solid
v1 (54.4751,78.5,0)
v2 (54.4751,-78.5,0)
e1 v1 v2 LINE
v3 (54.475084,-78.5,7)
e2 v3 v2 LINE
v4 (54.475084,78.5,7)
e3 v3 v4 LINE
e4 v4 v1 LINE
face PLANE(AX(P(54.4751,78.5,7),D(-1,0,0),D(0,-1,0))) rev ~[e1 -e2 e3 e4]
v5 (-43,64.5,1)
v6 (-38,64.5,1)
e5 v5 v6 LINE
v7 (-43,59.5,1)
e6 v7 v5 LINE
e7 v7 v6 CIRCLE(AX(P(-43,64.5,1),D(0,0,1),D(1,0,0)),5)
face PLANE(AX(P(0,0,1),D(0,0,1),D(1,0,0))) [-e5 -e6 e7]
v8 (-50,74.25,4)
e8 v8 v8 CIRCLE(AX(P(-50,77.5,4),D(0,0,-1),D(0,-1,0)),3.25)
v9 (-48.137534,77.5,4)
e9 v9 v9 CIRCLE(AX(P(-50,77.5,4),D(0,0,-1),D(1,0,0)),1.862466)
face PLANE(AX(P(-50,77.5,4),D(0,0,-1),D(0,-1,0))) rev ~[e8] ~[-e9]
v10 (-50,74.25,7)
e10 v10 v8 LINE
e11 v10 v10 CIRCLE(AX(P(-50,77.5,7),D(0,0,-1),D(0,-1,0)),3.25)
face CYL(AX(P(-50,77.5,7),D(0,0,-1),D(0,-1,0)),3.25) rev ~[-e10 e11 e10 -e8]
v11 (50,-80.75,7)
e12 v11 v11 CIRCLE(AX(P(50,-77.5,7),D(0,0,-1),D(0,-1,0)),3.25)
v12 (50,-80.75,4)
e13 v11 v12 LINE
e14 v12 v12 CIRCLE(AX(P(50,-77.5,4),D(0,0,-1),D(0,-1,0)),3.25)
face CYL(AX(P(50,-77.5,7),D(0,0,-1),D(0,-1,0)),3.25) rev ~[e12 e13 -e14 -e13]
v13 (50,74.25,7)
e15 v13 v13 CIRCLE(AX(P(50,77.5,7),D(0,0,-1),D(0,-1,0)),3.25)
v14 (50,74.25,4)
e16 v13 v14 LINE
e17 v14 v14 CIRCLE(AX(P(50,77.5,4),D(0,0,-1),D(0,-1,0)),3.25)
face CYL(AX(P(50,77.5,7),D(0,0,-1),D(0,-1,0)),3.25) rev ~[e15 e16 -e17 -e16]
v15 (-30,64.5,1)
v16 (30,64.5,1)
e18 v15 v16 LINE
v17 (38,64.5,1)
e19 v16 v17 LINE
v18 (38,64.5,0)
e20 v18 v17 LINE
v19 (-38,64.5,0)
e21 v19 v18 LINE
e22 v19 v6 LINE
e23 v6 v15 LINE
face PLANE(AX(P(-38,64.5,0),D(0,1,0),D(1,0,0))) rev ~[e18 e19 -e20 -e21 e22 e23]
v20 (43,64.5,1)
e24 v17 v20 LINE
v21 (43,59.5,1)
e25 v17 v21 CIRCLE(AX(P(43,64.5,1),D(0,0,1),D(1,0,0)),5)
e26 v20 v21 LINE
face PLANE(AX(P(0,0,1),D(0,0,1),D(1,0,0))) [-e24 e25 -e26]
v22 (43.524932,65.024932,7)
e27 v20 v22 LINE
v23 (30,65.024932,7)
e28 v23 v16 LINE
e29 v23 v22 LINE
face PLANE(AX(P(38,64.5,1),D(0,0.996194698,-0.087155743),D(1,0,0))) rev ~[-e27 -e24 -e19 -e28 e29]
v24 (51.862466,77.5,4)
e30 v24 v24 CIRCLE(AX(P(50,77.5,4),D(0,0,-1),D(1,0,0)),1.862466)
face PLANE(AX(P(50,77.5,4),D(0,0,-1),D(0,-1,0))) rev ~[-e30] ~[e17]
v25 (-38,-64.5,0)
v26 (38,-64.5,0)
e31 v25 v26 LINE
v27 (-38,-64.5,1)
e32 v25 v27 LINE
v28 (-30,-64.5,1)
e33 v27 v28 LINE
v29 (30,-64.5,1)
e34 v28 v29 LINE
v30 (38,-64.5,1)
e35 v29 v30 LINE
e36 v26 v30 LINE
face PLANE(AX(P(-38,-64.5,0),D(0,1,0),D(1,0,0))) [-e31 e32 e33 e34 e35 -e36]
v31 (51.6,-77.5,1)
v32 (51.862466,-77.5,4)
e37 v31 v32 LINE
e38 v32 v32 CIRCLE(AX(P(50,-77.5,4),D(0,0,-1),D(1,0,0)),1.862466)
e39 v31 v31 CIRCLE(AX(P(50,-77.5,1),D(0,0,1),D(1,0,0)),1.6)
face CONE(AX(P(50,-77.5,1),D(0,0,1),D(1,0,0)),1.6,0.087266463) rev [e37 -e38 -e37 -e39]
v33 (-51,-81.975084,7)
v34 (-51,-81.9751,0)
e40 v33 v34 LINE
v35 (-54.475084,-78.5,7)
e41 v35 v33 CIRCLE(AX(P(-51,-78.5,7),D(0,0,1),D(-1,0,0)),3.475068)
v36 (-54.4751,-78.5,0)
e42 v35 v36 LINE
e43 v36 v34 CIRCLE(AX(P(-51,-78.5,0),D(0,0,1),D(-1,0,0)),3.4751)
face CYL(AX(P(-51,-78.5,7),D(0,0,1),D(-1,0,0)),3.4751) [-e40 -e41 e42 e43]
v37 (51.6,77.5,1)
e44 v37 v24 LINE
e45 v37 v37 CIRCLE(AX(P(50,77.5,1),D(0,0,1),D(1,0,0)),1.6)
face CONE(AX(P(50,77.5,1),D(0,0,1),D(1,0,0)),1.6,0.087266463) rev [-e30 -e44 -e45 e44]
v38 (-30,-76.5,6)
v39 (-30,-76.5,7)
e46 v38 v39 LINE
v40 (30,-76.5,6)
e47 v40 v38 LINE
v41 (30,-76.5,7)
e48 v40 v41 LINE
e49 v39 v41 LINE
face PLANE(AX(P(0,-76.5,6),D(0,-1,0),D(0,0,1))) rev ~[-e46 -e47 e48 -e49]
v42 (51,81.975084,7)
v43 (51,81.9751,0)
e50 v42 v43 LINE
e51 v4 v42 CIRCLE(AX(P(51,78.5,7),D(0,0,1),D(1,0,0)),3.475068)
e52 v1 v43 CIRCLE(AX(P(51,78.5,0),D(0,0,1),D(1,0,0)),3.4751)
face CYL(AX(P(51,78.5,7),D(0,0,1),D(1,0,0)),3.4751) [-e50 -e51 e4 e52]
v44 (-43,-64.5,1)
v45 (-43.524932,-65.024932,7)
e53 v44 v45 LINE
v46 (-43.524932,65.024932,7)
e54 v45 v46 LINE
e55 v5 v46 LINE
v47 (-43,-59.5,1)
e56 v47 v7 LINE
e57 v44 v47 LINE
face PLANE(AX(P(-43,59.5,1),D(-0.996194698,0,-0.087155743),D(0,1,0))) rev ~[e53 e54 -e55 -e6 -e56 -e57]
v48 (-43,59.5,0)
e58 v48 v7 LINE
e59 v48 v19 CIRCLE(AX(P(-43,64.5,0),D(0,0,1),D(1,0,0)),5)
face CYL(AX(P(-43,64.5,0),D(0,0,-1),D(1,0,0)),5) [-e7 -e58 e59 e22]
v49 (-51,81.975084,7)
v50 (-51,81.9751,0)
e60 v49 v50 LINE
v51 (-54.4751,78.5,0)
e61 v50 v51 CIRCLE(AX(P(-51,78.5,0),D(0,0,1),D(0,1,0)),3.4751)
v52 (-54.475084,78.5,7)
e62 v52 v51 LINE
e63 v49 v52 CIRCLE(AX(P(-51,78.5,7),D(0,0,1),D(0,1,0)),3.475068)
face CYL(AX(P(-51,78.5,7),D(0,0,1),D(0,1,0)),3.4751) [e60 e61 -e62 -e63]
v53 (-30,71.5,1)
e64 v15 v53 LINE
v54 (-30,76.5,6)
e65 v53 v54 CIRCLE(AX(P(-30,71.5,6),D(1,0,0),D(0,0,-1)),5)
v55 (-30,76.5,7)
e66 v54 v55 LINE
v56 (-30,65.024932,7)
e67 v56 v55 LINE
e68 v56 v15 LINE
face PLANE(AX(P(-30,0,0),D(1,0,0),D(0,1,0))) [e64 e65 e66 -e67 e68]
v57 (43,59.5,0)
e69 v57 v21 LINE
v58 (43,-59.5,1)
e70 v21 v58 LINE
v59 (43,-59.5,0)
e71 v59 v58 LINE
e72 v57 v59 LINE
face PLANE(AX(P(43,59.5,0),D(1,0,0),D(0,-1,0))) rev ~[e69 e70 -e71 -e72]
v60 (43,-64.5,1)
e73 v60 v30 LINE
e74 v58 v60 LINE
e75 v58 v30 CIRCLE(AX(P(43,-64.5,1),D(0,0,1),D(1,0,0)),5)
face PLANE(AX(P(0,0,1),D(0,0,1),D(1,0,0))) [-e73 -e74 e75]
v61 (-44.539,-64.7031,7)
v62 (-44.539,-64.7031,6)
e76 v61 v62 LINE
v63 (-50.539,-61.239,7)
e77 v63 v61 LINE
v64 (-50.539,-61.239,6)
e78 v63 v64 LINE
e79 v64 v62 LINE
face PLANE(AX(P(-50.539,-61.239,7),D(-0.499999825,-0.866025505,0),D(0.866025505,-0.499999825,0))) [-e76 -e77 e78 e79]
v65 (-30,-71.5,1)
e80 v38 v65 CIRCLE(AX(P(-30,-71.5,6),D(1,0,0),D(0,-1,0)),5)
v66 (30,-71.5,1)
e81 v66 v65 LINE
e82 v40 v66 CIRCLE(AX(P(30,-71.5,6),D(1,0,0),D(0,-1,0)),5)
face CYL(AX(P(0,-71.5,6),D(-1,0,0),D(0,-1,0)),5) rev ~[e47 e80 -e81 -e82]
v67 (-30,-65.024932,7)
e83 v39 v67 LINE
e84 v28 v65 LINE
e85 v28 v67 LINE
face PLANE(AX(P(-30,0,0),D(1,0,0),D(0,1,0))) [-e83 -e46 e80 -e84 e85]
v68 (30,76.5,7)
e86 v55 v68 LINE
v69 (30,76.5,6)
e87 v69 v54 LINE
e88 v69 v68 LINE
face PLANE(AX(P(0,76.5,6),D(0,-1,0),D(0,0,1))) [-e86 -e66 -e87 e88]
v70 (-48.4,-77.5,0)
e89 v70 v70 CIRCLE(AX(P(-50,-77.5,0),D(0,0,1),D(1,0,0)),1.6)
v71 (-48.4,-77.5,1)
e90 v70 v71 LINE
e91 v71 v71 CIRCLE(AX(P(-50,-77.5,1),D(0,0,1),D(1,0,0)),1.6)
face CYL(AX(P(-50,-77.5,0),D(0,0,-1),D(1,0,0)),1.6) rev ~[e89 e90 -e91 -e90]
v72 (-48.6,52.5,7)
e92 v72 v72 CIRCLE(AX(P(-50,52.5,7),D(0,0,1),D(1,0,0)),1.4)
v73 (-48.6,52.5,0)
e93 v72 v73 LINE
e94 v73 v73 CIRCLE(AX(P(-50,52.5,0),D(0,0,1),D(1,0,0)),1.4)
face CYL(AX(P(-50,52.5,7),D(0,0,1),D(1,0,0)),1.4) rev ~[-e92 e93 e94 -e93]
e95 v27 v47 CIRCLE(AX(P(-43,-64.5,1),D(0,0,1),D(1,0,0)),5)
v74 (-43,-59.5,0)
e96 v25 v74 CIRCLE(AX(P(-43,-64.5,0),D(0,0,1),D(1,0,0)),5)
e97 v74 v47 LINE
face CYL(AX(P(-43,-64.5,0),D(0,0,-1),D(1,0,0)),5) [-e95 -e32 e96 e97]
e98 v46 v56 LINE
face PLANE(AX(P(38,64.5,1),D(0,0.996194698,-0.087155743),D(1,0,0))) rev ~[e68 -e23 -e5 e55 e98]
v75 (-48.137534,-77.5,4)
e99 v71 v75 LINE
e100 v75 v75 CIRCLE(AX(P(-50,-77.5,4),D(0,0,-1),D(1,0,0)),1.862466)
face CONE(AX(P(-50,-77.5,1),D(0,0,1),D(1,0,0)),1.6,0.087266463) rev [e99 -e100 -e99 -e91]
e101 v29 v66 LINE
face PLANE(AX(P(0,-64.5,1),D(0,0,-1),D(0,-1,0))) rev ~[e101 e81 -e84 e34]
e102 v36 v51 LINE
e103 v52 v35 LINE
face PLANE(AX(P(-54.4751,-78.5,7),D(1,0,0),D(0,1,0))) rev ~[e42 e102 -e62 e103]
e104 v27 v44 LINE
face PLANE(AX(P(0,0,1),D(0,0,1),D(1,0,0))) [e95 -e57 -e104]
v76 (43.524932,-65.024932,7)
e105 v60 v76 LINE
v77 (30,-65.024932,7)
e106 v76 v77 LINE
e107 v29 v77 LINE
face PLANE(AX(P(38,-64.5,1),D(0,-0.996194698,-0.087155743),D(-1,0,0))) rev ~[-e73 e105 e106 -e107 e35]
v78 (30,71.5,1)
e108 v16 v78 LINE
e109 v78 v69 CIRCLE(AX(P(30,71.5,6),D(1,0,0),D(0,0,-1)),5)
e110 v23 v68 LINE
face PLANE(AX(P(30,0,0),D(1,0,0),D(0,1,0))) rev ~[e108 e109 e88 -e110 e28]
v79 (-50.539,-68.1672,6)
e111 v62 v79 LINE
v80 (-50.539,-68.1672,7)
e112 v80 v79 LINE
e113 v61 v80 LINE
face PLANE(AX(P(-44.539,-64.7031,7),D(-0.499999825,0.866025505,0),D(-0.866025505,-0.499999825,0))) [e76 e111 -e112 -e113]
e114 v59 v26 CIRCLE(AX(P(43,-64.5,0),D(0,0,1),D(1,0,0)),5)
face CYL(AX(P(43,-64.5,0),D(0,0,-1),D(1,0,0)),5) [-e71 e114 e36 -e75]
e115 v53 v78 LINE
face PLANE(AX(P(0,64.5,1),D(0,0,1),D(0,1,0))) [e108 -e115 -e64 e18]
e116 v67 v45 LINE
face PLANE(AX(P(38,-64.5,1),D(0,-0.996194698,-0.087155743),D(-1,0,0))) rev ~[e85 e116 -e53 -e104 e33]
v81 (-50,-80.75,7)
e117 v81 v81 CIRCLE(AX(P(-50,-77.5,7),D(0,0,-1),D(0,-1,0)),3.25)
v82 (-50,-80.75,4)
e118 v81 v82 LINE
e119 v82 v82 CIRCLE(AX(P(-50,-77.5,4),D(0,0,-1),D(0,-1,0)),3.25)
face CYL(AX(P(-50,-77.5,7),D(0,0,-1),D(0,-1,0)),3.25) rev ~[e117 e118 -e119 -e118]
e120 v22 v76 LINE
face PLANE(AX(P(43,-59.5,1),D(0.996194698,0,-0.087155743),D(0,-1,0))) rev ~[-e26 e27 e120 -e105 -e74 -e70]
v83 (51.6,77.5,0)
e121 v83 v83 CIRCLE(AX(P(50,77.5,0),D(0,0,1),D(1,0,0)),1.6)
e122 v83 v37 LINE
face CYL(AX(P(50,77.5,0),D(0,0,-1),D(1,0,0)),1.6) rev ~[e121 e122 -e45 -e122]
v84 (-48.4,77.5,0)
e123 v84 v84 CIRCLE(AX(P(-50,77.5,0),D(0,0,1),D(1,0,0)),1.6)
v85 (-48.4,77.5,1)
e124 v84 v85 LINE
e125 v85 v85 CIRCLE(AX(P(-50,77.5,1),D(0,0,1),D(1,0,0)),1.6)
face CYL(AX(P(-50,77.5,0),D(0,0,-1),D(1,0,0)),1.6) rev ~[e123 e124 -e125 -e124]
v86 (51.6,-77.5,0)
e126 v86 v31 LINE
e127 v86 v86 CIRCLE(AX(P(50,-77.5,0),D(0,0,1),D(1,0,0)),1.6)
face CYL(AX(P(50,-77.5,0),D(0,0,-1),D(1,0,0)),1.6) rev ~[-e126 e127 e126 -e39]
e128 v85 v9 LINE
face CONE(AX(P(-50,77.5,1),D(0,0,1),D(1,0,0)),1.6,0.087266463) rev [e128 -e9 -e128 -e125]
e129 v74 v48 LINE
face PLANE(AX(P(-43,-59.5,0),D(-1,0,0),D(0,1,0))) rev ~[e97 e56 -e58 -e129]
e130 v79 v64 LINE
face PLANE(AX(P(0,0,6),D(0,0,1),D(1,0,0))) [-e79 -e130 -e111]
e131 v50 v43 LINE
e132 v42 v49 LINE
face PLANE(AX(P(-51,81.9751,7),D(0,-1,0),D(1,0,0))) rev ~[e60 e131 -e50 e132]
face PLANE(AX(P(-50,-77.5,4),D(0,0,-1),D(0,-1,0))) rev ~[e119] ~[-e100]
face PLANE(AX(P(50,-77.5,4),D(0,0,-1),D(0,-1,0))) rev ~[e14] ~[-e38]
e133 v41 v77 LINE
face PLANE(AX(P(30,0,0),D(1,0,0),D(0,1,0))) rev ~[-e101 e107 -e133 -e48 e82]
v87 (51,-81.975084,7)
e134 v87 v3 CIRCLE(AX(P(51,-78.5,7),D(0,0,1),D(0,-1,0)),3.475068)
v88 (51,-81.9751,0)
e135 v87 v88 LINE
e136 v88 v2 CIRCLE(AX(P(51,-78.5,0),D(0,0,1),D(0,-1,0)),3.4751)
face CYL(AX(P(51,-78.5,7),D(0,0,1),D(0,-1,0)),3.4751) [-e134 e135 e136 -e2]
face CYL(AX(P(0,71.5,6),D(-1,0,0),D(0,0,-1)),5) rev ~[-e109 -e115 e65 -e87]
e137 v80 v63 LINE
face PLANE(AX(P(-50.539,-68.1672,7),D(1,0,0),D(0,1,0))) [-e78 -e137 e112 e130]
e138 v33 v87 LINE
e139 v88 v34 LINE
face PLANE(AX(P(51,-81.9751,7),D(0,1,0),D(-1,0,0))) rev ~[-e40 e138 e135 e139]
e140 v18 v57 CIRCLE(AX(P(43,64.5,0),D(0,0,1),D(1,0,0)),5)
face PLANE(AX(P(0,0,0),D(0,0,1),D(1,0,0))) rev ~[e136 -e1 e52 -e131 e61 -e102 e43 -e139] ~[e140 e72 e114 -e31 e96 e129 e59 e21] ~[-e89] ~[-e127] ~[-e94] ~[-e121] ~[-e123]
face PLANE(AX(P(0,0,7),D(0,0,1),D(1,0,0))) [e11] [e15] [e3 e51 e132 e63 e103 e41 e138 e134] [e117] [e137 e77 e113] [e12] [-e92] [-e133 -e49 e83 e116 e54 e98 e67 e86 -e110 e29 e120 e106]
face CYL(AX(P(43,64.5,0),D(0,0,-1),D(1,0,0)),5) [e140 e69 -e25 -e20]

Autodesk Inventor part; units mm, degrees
ref_plane "YZ Plane" through (0, 0, 0) normal (1, 0, 0) x (0, 1, 0)
ref_plane "XZ Plane" through (0, 0, 0) normal (0, 1, 0) x (-1, 0, 0)
ref_plane "XY Plane" through (0, 0, 0) normal (0, 0, 1) x (1, 0, 0)
ref_plane "Arbeitsebene1" through (0, 0, 0) normal (0, 0, 1) x (1, 0, 0)
sketch "Skizze1" plane through (0, 0, 0) normal (0, 0, 1) x (1, 0, 0)
  line L0 (50, 77.5) -> (-50, 77.5) construction
  line L1 (-50, 77.5) -> (-50, -77.5) construction
  line L2 (-50, -77.5) -> (50, -77.5) construction
  line L3 (50, -77.5) -> (50, 77.5) construction
  line L4 (51, 82.5) -> (-51, 82.5)
  line L5 (-55, 78.5) -> (-55, -78.5)
  line L6 (-51, -82.5) -> (51, -82.5)
  line L7 (55, -78.5) -> (55, 78.5)
  circle A0 centre (50, 77.5) radius 1.6
  circle A1 centre (50, -77.5) radius 1.6
  circle A2 centre (-50, -77.5) radius 1.6
  circle A3 centre (-50, 77.5) radius 1.6
  arc A4 (55, 78.5) -> (51, 82.5) centre (51, 78.5) ccw
  arc A5 (51, -82.5) -> (55, -78.5) centre (51, -78.5) ccw
  arc A6 (-55, -78.5) -> (-51, -82.5) centre (-51, -78.5) ccw
  arc A7 (-51, 82.5) -> (-55, 78.5) centre (-51, 78.5) ccw
  line L8 (43, 64.5) -> (43, -64.5)
  line L9 (-43, -64.5) -> (-43, 64.5)
  line L10 (-43, 63.5) -> (-43, 64.5)
  line L11 (-43, 64.5) -> (43, 64.5)
  line L12 (43, 64.5) -> (43, 74.0537)
  line L13 (-43, -64.5) -> (43, -64.5)
  circle A8 centre (-43, 64.5) radius 5
  circle A9 centre (43, 64.5) radius 5
  circle A10 centre (43, -64.5) radius 5
  circle A11 centre (-43, -64.5) radius 5
  point P0 (0, 0)
  point P1 (-43, -59.5)
  point P2 (-43, 59.5)
  point P3 (-38, 64.5)
  point P4 (38, 64.5)
  point P5 (43, 59.5)
  point P6 (43, -59.5)
  point P7 (38, -64.5)
  point P8 (-38, -64.5)
  dimension "d1" = 3.2
  dimension "d2" = 3.2
  dimension "d3" = 3.2
  dimension "d4" = 3.2
  dimension "d5" = 4
  dimension "d6" = 86
  dimension "d10" = 10
  dimension "d11" = 10
  dimension "d12" = 10
  dimension "d13" = 10
  dimension "d31" = 43
  dimension "d32" = 129
  dimension "d33" = 100
  dimension "d34" = 155
  dimension "d35" = 64.5
  dimension "d36" = 55
  dimension "d37" = 110
  dimension "d38" = 165
  dimension "d39" = 82.5
extrude "Extrusion1" add sketch "Skizze1" along normal blind 1 contours A4 L7 A5 L6 A6 L5 A7 L4 | L12 A9 L8 | L8 A9 L11 | L11 A9 L12 | A10 L13 L8 | L8 L13 A10 | A8 L9 L11 | L11 L9 A8 | A11 L9 L13 | L13 L9 A11
sketch "Skizze2" plane through (0, 0, 1) normal (0, 0, 1) x (1, 0, 0)
  arc A0 (-51, 82.5) -> (-55, 78.5) centre (-51, 78.5) ccw projected
  line L0 (-55, 78.5) -> (-55, -78.5) projected
  arc A1 (-55, -78.5) -> (-51, -82.5) centre (-51, -78.5) ccw projected
  line L1 (-51, -82.5) -> (51, -82.5) projected
  arc A2 (51, -82.5) -> (55, -78.5) centre (51, -78.5) ccw projected
  line L2 (55, -78.5) -> (55, 78.5) projected
  arc A3 (55, 78.5) -> (51, 82.5) centre (51, 78.5) ccw projected
  line L3 (51, 82.5) -> (-51, 82.5) projected
  arc A4 (-38, -64.5) -> (-43, -59.5) centre (-43, -64.5) ccw projected
  line L4 (-43, -59.5) -> (-43, 59.5) projected
  arc A5 (-43, 59.5) -> (-38, 64.5) centre (-43, 64.5) ccw projected
  line L5 (-38, 64.5) -> (38, 64.5) projected
  arc A6 (38, 64.5) -> (43, 59.5) centre (43, 64.5) ccw projected
  line L6 (43, 59.5) -> (43, -59.5) projected
  arc A7 (43, -59.5) -> (38, -64.5) centre (43, -64.5) ccw projected
  line L7 (38, -64.5) -> (-38, -64.5) projected
  circle A8 centre (-50, 77.5) radius 1.6 projected
  circle A9 centre (-50, -77.5) radius 1.6 projected
  circle A10 centre (50, -77.5) radius 1.6 projected
  circle A11 centre (50, 77.5) radius 1.6 projected
  line L8 (-43, 64.5) -> (43, 64.5)
  line L9 (43, 64.5) -> (43, -64.5)
  line L10 (43, -64.5) -> (-43, -64.5)
  line L11 (-43, -64.5) -> (-43, 64.5)
  point P0 (-43, 59.5)
  point P1 (43, -59.5)
  point P2 (38, -64.5)
  point P3 (-43, -59.5)
extrude "Extrusion2" add sketch "Skizze2" along normal blind 6 draft -5
sketch "Skizze3" plane through (0, 0, 7) normal (0, 0, 1) x (1, 0, 0)
  line L0 (-44.539, -64.7031) -> (-50.539, -68.1672)
  line L1 (-50.539, -68.1672) -> (-50.539, -61.239)
  line L2 (-50.539, -61.239) -> (-44.539, -64.7031)
  line L3 (39.5249, 74.6999) -> (39.5249, -55.3499) projected
  point P0 (0, 0)
  point P1 (-48.539, -64.7031)
  dimension "d23" = 6
extrude "Extrusion3" cut sketch "Skizze3" against normal blind 1
sketch "Skizze4" plane through (0, 0, 7) normal (0, 0, 1) x (1, 0, 0)
  line L0 (-44.539, -64.7031) -> (-50.539, -68.1672) projected
  line L1 (-50.539, -61.239) -> (-44.539, -64.7031) projected
  circle A0 centre (-50, 77.5) radius 2.1249 projected
  circle A1 centre (-50, -77.5) radius 2.1249 projected
  circle A2 centre (50, -77.5) radius 2.1249 projected
  circle A3 centre (50, 77.5) radius 2.1249 projected
  line L2 (-54.4751, -78.5) -> (-54.4751, 78.5) projected
  arc A4 (-54.4751, -78.5) -> (-51, -81.9751) centre (-51, -78.5) ccw projected
  line L3 (51, -81.9751) -> (-51, -81.9751) projected
  arc A5 (51, -81.9751) -> (54.4751, -78.5) centre (51, -78.5) ccw projected
  line L4 (54.4751, 78.5) -> (54.4751, -78.5) projected
  arc A6 (54.4751, 78.5) -> (51, 81.9751) centre (51, 78.5) ccw projected
  line L5 (-51, 81.9751) -> (51, 81.9751) projected
  arc A7 (-51, 81.9751) -> (-54.4751, 78.5) centre (-51, 78.5) ccw projected
  circle A8 centre (-50, -77.5) radius 1.6 projected
  circle A9 centre (50, -77.5) radius 1.6 projected
  circle A10 centre (50, 77.5) radius 1.6 projected
  circle A11 centre (-50, 77.5) radius 1.6 projected
  line L6 (-50.539, -68.1672) -> (-50.539, -61.239) projected
  point P0 (0, 0)
hole "Bohrung1" at (-50, -77.5, 7) at (50, -77.5, 7) at (50, 77.5, 7) at (-50, 77.5, 7) direction (0, 0, -1) diameter 3.2 end through all counterbore diameter 6.5 counterbore depth 3
sketch "Skizze5" plane through (0, 0, 0) normal (1, 0, 0) x (0, 1, 0)
  line L0 (64.5, 1) -> (65.0249, 7) projected
  line L1 (64.5, 1) -> (71.5, 1)
  line L2 (76.5, 6) -> (76.5, 16)
  line L3 (76.5, 16) -> (64.5, 16)
  line L4 (64.5, 16) -> (64.5, 1)
  line L5 (-64.5, 0) -> (-64.5, 1) projected
  line L6 (-64.5, 1) -> (-71.5, 1)
  line L7 (-76.5, 6) -> (-76.5, 12.183)
  line L8 (-76.5, 12.183) -> (-64.5, 12.183)
  line L9 (-64.5, 12.183) -> (-64.5, 1)
  arc A0 (-76.5, 6) -> (-71.5, 1) centre (-71.5, 6) ccw
  arc A1 (71.5, 1) -> (76.5, 6) centre (71.5, 6) ccw
  point P0 (0, 0)
  point P1 (76.5, 1)
  dimension "d40" = 12
  dimension "d41" = 15
  dimension "d42" = 12
  dimension "d43" = 5
extrude "Extrusion4" cut sketch "Skizze5" along normal mid plane 60
sketch "Skizze6" plane through (0, 0, 7) normal (0, 0, 1) x (1, 0, 0)
  circle A0 centre (-50, 77.5) radius 1.8625 projected
  line L0 (-43.5249, -65.0249) -> (-43.5249, 65.0249) projected
  line L1 (-43.5249, 65.0249) -> (-37.8681, 65.0249) construction
  circle A1 centre (-50, 52.5) radius 1.4
  point P0 (0, 0)
  dimension "d48" = 2.8
  dimension "d51" = 25
extrude "Extrusion5" cut sketch "Skizze6" against normal blind 60 contours A1
sketch "Skizze7" plane through (0, 0, 7) normal (0, 0, 1) x (1, 0, 0)
  circle A0 centre (-50, 52.5) radius 1.4 projected
  line L0 (-54.4751, -78.5) -> (-54.4751, 78.5) projected
  arc A1 (-54.4751, -78.5) -> (-51, -81.9751) centre (-51, -78.5) ccw projected
  line L1 (51, -81.9751) -> (-51, -81.9751) projected
  arc A2 (51, -81.9751) -> (54.4751, -78.5) centre (51, -78.5) ccw projected
  line L2 (54.4751, 78.5) -> (54.4751, -78.5) projected
  arc A3 (54.4751, 78.5) -> (51, 81.9751) centre (51, 78.5) ccw projected
  line L3 (-51, 81.9751) -> (51, 81.9751) projected
  arc A4 (-51, 81.9751) -> (-54.4751, 78.5) centre (-51, 78.5) ccw projected
  line L4 (-44.539, -64.7031) -> (-50.539, -68.1672) projected
  line L5 (-50.539, -68.1672) -> (-50.539, -61.239) projected
  line L6 (-50.539, -61.239) -> (-44.539, -64.7031) projected
  circle A5 centre (-50, 77.5) radius 3.25 projected
  circle A6 centre (50, -77.5) radius 3.25 projected
  circle A7 centre (-50, -77.5) radius 3.25 projected
  circle A8 centre (50, 77.5) radius 3.25 projected
  line L7 (30, -65.0249) -> (30, -76.5) projected
  line L8 (30, -76.5) -> (-30, -76.5) projected
  line L9 (-30, -76.5) -> (-30, -65.0249) projected
  line L10 (-30, -65.0249) -> (-43.5249, -65.0249) projected
  line L11 (-43.5249, -65.0249) -> (-43.5249, 65.0249) projected
  line L12 (-43.5249, 65.0249) -> (-30, 65.0249) projected
  line L13 (-30, 65.0249) -> (-30, 76.5) projected
  line L14 (-30, 76.5) -> (30, 76.5) projected
  line L15 (30, 76.5) -> (30, 65.0249) projected
  line L16 (30, 65.0249) -> (43.5249, 65.0249) projected
  line L17 (43.5249, 65.0249) -> (43.5249, -65.0249) projected
  line L18 (43.5249, -65.0249) -> (30, -65.0249) projected
  line L19 (-50, -81.5) -> (50, -81.5)
  line L20 (54, -77.5) -> (54, 77.5)
  line L21 (50, 81.5) -> (-50, 81.5)
  line L22 (-54, 77.5) -> (-54, -77.5)
  line L23 (-54, -81.5) -> (54, 81.5) construction
  line L24 (54, -81.5) -> (-54, 81.5) construction
  arc A9 (54, 77.5) -> (50, 81.5) centre (50, 77.5) ccw
  arc A10 (-50, 81.5) -> (-54, 77.5) centre (-50, 77.5) ccw
  arc A11 (-54, -77.5) -> (-50, -81.5) centre (-50, -77.5) ccw
  arc A12 (50, -81.5) -> (54, -77.5) centre (50, -77.5) ccw
  point P0 (0, 0)
  dimension "d52" = 108
  dimension "d53" = 163
  dimension "d54" = 4
extrude "Extrusion6" cut sketch "Skizze7" against normal blind 10 contours A0 | L0 A4 L3 A3 L2 A2 L1 A1 | L4 L5 L6 | A5 | A6 | A7 | A8 | L7 L8 L9 L10 L11 L12 L13 L14 L15 L16 L17 L18 | A11 L22 A10 L21 A9 L20 A12 L19 keep common part
equation "\"d11\" = d10"
equation "\"d12\" = d10"
equation "\"d13\" = d10"
equation "\"d31\" = 0.5 * d6"
equation "\"d35\" = 0.5 * d32"
equation "\"d36\" = 0.5 * d37"
equation "\"d39\" = 0.5 * d38"
properties part number "30_xystage_gp-010b_adapter_multiwellplate"
